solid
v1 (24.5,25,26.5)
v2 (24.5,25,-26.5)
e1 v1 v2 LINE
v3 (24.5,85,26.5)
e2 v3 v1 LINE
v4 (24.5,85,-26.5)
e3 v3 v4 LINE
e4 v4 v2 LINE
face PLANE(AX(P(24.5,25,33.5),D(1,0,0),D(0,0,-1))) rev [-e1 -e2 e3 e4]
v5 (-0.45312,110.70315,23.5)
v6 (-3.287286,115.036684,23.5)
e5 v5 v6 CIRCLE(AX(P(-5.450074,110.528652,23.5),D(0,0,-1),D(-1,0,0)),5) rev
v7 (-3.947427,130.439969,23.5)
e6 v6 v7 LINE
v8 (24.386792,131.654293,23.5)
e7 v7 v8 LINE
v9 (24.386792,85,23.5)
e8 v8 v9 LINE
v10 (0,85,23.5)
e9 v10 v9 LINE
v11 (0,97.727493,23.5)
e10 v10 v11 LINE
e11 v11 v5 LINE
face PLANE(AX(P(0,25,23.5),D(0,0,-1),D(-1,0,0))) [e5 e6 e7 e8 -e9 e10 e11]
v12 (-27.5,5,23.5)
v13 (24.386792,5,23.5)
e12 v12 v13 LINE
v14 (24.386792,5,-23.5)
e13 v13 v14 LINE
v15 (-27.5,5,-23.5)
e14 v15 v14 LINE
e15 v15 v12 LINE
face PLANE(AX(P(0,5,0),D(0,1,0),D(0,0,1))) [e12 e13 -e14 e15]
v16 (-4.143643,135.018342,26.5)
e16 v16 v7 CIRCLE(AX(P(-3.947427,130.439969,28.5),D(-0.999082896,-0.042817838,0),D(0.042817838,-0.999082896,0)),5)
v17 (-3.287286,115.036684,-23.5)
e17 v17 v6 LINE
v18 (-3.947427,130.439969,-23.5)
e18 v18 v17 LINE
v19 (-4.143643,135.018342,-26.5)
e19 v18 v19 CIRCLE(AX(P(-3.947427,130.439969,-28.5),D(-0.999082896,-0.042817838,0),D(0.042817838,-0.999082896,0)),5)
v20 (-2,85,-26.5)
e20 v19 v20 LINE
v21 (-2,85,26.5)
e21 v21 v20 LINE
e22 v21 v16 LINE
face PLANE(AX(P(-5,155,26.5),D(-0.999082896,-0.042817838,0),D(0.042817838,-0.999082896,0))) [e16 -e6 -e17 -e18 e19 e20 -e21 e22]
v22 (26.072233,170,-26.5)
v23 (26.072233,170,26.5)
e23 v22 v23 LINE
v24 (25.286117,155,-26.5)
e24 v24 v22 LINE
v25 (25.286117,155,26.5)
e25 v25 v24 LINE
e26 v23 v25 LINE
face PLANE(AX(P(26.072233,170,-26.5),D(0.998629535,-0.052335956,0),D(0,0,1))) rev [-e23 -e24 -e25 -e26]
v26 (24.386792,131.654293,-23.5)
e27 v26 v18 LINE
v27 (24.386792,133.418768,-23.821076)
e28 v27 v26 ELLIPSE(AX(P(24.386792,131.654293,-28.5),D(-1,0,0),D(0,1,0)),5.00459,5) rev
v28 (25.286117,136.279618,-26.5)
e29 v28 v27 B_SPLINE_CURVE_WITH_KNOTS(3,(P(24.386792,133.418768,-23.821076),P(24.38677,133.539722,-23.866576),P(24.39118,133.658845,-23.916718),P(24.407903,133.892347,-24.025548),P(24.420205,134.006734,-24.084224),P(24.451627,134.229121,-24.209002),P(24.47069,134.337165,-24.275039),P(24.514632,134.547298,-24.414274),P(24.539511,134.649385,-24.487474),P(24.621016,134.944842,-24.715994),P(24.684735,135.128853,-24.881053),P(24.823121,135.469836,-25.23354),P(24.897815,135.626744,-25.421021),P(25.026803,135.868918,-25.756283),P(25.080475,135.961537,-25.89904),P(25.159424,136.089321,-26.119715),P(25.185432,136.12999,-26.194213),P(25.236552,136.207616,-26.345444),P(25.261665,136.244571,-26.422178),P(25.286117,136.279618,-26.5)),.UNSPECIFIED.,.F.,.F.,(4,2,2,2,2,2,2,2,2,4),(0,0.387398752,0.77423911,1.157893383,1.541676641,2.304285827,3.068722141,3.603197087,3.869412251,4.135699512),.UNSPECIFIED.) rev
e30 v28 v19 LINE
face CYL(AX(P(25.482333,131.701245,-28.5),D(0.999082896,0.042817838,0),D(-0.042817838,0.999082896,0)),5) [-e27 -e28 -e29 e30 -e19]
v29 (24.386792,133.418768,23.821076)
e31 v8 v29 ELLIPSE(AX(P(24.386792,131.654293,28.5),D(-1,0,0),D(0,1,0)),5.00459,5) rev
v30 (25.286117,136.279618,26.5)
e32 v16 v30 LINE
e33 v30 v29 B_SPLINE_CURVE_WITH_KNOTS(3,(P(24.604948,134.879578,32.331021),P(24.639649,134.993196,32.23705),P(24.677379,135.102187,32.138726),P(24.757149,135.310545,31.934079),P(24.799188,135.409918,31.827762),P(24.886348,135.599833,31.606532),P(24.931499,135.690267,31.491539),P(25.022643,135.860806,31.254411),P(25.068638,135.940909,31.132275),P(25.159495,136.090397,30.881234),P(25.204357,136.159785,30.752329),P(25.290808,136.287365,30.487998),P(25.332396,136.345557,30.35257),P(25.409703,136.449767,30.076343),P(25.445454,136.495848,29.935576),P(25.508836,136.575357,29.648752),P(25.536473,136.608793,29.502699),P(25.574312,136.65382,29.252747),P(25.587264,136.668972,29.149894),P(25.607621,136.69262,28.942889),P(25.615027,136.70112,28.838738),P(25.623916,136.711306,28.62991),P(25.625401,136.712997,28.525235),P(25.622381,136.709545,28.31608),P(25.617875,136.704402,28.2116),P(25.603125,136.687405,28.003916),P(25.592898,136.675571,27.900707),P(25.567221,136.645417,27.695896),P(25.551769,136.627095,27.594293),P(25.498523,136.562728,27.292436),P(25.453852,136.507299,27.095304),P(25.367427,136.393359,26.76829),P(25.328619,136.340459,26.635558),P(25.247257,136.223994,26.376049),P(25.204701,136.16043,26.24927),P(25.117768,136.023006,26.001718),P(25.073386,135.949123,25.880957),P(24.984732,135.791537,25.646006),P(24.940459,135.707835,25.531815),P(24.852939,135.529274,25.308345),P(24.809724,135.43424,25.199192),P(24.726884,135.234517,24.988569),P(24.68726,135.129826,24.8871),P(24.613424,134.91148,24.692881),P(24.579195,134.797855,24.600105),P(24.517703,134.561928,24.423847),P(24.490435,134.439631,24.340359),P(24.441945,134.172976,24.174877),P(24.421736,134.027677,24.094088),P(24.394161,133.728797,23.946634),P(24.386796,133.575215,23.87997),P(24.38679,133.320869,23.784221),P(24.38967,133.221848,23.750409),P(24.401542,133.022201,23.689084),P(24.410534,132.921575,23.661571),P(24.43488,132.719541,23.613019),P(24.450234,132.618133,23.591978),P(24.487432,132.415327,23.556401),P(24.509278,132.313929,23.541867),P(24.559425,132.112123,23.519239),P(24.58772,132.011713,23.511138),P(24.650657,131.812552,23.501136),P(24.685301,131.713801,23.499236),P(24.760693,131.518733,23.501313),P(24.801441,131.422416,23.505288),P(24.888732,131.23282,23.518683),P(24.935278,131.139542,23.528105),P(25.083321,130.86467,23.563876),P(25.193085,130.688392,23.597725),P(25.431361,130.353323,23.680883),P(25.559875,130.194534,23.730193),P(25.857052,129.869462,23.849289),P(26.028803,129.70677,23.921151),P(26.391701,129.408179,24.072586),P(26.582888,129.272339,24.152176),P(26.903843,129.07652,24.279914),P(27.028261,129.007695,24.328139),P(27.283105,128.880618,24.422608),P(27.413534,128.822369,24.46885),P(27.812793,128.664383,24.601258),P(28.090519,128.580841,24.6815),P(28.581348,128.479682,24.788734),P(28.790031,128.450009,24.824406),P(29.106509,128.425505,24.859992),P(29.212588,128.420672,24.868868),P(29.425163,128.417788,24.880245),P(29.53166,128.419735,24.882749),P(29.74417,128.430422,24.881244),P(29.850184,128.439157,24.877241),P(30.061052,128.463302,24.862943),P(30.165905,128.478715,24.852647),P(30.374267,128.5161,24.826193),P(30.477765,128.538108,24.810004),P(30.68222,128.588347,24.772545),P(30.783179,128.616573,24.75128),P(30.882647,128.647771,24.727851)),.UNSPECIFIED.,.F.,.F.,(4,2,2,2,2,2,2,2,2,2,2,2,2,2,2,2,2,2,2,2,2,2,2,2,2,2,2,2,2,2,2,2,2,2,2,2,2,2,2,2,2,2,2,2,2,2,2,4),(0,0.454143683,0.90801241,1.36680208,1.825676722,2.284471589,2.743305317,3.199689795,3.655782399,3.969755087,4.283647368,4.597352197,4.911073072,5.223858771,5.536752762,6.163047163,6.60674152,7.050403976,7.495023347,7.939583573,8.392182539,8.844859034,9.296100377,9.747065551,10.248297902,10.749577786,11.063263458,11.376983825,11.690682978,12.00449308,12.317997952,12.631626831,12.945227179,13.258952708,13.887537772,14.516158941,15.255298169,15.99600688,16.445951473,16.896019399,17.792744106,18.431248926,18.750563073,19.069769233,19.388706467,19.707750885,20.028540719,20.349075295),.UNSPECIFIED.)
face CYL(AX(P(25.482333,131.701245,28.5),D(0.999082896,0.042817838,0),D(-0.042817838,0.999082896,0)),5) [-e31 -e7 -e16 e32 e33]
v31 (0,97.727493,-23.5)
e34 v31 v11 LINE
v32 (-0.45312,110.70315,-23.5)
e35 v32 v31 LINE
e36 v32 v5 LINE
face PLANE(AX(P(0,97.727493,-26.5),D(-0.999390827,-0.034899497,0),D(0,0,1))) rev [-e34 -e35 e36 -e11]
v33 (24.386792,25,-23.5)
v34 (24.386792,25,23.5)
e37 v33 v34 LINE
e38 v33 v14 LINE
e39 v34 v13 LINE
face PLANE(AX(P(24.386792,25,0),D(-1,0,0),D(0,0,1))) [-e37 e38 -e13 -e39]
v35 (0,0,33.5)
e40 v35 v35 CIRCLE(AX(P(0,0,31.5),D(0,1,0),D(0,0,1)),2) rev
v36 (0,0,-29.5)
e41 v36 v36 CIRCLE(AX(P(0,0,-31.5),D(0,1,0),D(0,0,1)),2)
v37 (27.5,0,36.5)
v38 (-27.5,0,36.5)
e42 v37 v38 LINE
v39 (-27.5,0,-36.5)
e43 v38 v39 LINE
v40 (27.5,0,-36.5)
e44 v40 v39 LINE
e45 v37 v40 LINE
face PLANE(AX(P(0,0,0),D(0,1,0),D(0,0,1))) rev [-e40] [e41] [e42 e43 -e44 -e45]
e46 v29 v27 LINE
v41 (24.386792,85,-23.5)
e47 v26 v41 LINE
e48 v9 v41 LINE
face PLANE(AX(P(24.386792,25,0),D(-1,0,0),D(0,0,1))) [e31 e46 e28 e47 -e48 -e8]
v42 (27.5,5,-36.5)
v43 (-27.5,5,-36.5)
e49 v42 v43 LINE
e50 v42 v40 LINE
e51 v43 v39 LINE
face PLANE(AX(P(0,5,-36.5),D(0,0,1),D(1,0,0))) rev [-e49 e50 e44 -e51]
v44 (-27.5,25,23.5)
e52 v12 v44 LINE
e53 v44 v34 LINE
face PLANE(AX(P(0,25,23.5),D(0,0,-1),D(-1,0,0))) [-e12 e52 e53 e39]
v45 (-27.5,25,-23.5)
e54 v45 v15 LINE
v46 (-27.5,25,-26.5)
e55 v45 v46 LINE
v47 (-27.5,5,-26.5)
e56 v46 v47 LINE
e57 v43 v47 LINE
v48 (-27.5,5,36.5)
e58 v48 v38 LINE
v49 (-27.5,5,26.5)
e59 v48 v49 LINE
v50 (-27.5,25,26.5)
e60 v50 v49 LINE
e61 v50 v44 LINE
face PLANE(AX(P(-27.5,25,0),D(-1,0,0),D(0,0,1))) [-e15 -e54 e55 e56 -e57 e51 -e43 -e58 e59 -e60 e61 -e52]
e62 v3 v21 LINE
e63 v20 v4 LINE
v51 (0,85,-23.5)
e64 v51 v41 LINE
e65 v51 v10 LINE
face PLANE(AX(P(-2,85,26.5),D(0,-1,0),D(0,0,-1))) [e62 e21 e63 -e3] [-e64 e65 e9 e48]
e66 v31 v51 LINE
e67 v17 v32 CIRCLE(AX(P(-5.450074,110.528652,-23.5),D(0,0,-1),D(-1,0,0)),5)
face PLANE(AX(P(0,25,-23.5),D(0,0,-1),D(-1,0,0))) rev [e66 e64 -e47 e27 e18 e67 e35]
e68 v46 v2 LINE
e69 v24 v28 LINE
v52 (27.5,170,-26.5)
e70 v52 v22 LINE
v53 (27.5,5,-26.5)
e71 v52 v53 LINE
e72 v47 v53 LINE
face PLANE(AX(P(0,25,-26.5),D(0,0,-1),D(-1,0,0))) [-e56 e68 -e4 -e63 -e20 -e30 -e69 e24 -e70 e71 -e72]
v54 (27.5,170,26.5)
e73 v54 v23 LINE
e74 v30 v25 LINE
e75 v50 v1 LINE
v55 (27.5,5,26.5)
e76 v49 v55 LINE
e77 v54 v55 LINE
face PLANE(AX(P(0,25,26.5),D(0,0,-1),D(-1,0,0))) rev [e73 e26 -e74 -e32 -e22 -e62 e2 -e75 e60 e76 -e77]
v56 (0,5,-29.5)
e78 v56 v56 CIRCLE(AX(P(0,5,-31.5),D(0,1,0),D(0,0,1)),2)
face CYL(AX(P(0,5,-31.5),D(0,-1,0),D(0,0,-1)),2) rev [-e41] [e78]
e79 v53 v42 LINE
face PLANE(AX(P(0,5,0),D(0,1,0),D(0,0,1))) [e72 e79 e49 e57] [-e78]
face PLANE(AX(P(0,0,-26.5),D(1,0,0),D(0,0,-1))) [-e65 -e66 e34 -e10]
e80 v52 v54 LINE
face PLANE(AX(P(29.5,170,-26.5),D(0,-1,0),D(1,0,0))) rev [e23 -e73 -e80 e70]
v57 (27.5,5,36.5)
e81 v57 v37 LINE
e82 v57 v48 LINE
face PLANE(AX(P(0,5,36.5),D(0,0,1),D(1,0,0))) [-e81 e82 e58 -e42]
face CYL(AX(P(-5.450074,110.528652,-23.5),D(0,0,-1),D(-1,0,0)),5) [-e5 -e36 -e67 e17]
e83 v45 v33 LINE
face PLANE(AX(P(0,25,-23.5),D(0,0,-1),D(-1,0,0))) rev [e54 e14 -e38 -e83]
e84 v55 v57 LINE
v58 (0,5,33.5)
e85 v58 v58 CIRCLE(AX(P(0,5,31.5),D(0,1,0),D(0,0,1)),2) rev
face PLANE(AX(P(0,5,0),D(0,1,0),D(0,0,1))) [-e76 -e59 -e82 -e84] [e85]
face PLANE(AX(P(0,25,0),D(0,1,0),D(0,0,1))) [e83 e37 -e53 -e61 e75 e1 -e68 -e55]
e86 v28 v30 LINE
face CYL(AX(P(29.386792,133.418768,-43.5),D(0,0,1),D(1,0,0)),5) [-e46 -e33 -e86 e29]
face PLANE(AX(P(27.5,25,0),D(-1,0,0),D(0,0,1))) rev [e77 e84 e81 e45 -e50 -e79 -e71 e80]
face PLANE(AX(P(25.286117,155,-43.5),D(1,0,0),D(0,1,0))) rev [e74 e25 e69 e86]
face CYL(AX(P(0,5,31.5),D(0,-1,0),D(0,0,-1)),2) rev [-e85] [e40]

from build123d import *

# Parameters (mm, degrees)
CROQUIS1_W              = 55
CROQUIS1_H              = 53
CROQUIS1_W_2            = 48.773584906
CROQUIS1_H_2            = 47
SALIENTE_EXTRUIR1_DEPTH = 25
SALIENTE_EXTRUIR2_DEPTH = 160
SALIENTE_EXTRUIR3_DEPTH = 50
SALIENTE_EXTRUIR5_DEPTH = 3
CROQUIS4_W              = 100
CROQUIS4_H              = 30
CORTAR_EXTRUIR1_DEPTH   = 63
CHAFL_N1_SIZE           = 2
CHAFL_N1_SIZE2          = 57.272506566
CROQUIS1_2_W            = 55
CROQUIS1_2_H            = 53
CROQUIS1_2_W_2          = 48.773584906
CROQUIS1_2_H_2          = 47
SALIENTE_EXTRUIR6_DEPTH = 5
CROQUIS5_W              = 30
CROQUIS5_H              = 60
CORTAR_EXTRUIR2_DEPTH   = 60
CROQUIS1_4_W            = 55
CROQUIS1_4_H            = 10
CROQUIS1_4_R            = 2
SALIENTE_EXTRUIR7_DEPTH = 5
CROQUIS6_W              = 53
CROQUIS6_H              = 15
CORTAR_EXTRUIR3_DEPTH   = 5
CHAFL_N2_SIZE           = 30
CHAFL_N2_SIZE_2         = 1.572233378
CHAFL_N3_SIZE           = 5
CHAFL_N3_SIZE2          = 0.881634904
CROQUIS7_W              = 47
CROQUIS7_H              = 20
CORTAR_EXTRUIR4_DEPTH   = 40
CROQUIS8_W              = 47
CROQUIS8_H              = 40
CORTAR_EXTRUIR5_DEPTH   = 10
CORTAR_EXTRUIR6_DEPTH   = 70
REDONDEO3_R             = 5
REDONDEO5_R             = 5


with BuildPart() as part:
    # Croquis1 → Saliente-Extruir1 (new body)
    with BuildSketch(Plane(origin=(0, 0, 0), x_dir=(1, 0, 0), z_dir=(0, 1, 0))):
        Rectangle(CROQUIS1_W, CROQUIS1_H)
        Rectangle(CROQUIS1_W_2, CROQUIS1_H_2, mode=Mode.SUBTRACT)
    extrude(amount=SALIENTE_EXTRUIR1_DEPTH)

    # Croquis2 → Saliente-Extruir2 (add)
    with BuildSketch(Plane(origin=(0, 25, 0), x_dir=(1, 0, 0), z_dir=(0, 1, 0))):
        Polygon((0, 23.5), (0, 26.5), (27.5, 26.5), (27.5, -26.5), (0, -26.5), (0, -23.5), (24.386792453, -23.5), (24.386792453, 23.5), align=None)
    extrude(amount=SALIENTE_EXTRUIR2_DEPTH)



with BuildPart() as body_2:
    # Croquis3 → Saliente-Extruir3 (new body)
    with BuildSketch(Plane(origin=(0, 0, 23.5), x_dir=(-1, 0, 0), z_dir=(0, 0, -1))):
        Polygon((0, 155), (5, 155), (2, 85), (0, 85), align=None)
    extrude(amount=SALIENTE_EXTRUIR3_DEPTH)


with BuildPart() as part_1:
    add(part.part)

    add(body_2.part)  # Saliente-Extruir5 merges body 2
    # Croquis3<4> → Saliente-Extruir5 (add)
    with BuildSketch(Plane(origin=(0, 0, 23.5), x_dir=(-1, 0, 0), z_dir=(0, 0, -1))):
        Polygon((0, 155), (5, 155), (2, 85), (0, 85), align=None)
    extrude(amount=-SALIENTE_EXTRUIR5_DEPTH)

    # Croquis4 → Cortar-Extruir1 (cut)
    with BuildSketch(Plane(origin=(0, 0, -26.5), x_dir=(-1, 0, 0), z_dir=(0, 0, -1))):
        with Locations((25.5, 170)):
            Rectangle(CROQUIS4_W, CROQUIS4_H)
    extrude(amount=-CORTAR_EXTRUIR1_DEPTH, mode=Mode.SUBTRACT)

    # Chaflán1
    chafl_n1_edges = [part_1.edges().sort_by_distance(p)[0] for p in [
        (0, 155, 0),
    ]]
    chafl_n1_side = [part_1.faces().sort_by_distance(p)[0] for p in [
        (9.75, 155, -25.893431785),
    ]]
    chamfer(chafl_n1_edges, length=CHAFL_N1_SIZE, length2=CHAFL_N1_SIZE2, reference=chafl_n1_side[0])

    # Croquis1<2> → Saliente-Extruir6 (add)
    # profile 1 of 2: a face of its own
    with BuildSketch(Plane(origin=(0, 0, 0), x_dir=(1, 0, 0), z_dir=(0, 1, 0))):
        Rectangle(CROQUIS1_2_W, CROQUIS1_2_H)
        Rectangle(CROQUIS1_2_W_2, CROQUIS1_2_H_2, mode=Mode.SUBTRACT)
    # profile 2 of 2: a face of its own
    with BuildSketch(Plane(origin=(0, 0, 0), x_dir=(1, 0, 0), z_dir=(0, 1, 0))):
        Rectangle(CROQUIS1_2_W_2, CROQUIS1_2_H_2)
    extrude(amount=SALIENTE_EXTRUIR6_DEPTH)

    # Croquis5 → Cortar-Extruir2 (cut)
    with BuildSketch(Plane(origin=(0, 0, -26.5), x_dir=(-1, 0, 0), z_dir=(0, 0, -1))):
        with Locations((-9.5, 55)):
            Rectangle(CROQUIS5_W, CROQUIS5_H)
    extrude(amount=-CORTAR_EXTRUIR2_DEPTH, mode=Mode.SUBTRACT)

    # Croquis1<4> → Saliente-Extruir7 (add)
    # profile 1 of 2: a face of its own
    with BuildSketch(Plane(origin=(0, 0, 0), x_dir=(1, 0, 0), z_dir=(0, 1, 0))):
        with Locations((0, 31.5)):
            Rectangle(CROQUIS1_4_W, CROQUIS1_4_H)
        with Locations(Location((0, 31.5, 0), (0, 0, 270))):
            Circle(CROQUIS1_4_R, mode=Mode.SUBTRACT)
    # profile 2 of 2: a face of its own
    with BuildSketch(Plane(origin=(0, 0, 0), x_dir=(1, 0, 0), z_dir=(0, 1, 0))):
        with Locations((0, -31.5)):
            Rectangle(CROQUIS1_4_W, CROQUIS1_4_H)
        with Locations(Location((0, -31.5, 0), (0, 0, 270))):
            Circle(CROQUIS1_4_R, mode=Mode.SUBTRACT)
    extrude(amount=SALIENTE_EXTRUIR7_DEPTH)

    # Croquis6 → Cortar-Extruir3 (cut)
    with BuildSketch(Plane.ZY.offset(-24.5)):
        with Locations((0, 177.5)):
            Rectangle(CROQUIS6_W, CROQUIS6_H)
    extrude(amount=-CORTAR_EXTRUIR3_DEPTH, mode=Mode.SUBTRACT)

    # Chaflán2
    # the kernel refuses this chamfer: 30, 1.572233378 mm, written as the material it takes off along each edge
    with BuildSketch(Plane(origin=(24.5, 170, -104.496046635), x_dir=(-0.002013023422382327, -0.9999979738662979, 0), z_dir=(0, 0, 1))) as chafl_n2_piece_1_section:
        Polygon((CHAFL_N2_SIZE * 0.999997973866, CHAFL_N2_SIZE * 0.00201302342238), (-CHAFL_N2_SIZE_2 * 0.00201302342301, CHAFL_N2_SIZE_2 * 0.999997974179), (0, 0), align=None)
    chafl_n2_piece_1 = extrude(amount=208.992093269, mode=Mode.PRIVATE)
    chafl_n2_piece_1 = split(chafl_n2_piece_1, bisect_by=Plane(origin=(25.111424092, 155, 0), z_dir=(0, 1, 0)), keep=Keep.TOP, mode=Mode.PRIVATE)
    add(chafl_n2_piece_1, mode=Mode.SUBTRACT)

    # Chaflán3
    chafl_n3_edges = [part_1.edges().sort_by_distance(p)[0] for p in [
        (24.386792453, 155, 0),
    ]]
    chafl_n3_side = [part_1.faces().sort_by_distance(p)[0] for p in [
        (24.386792453, 120, 0),
    ]]
    chamfer(chafl_n3_edges, length=CHAFL_N3_SIZE, length2=CHAFL_N3_SIZE2, reference=chafl_n3_side[0])

    # Croquis7 → Cortar-Extruir4 (cut)
    with BuildSketch(Plane.ZY.offset(27.5)):
        with Locations((0, 15)):
            Rectangle(CROQUIS7_W, CROQUIS7_H)
    extrude(amount=-CORTAR_EXTRUIR4_DEPTH, mode=Mode.SUBTRACT)

    # Croquis8 → Cortar-Extruir5 (cut)
    with BuildSketch(Plane(origin=(1.639845182, 0.070279079, 0), x_dir=(0, 0, 1), z_dir=(-0.9990828958176697, -0.04281783839218585, 0))):
        with Locations((0, 135.071938044)):
            Rectangle(CROQUIS8_W, CROQUIS8_H)
    extrude(amount=-CORTAR_EXTRUIR5_DEPTH, mode=Mode.SUBTRACT)

    # Croquis9 → Cortar-Extruir6 (cut)
    with BuildSketch(Plane.XY.offset(26.5)):
        Polygon((-5, 155), (25.286116689, 155), (25.286116689, 136.279617509), (-4.143643232, 135.018342084), align=None)
    extrude(amount=-CORTAR_EXTRUIR6_DEPTH, mode=Mode.SUBTRACT)

    # Redondeo3
    # the kernel refuses this fillet: 5 mm, written as the material it takes off along each edge
    with BuildSketch(Plane(origin=(-4.143643232, 135.018342084, 23.5), x_dir=(0, 0, 1), z_dir=(0.9990828958176697, 0.042817838392185704, 0))) as redondeo3_piece_1_section:
        with BuildLine():
            CenterArc((5, 4.582575695), REDONDEO3_R, 180, 66.421821522)
            Line((0, 4.582575695), (-0.1, 4.582575695))
            Line((-0.1, 4.582575695), (-0.1, 0))
            Line((-0.1, 0), (0, -0.1))
            ThreePointArc((0, -0.1), (1.5, -0.1), (2.96, -0.091651514))
            Line((2.96, -0.091651514), (3, 0))
        make_face()
    redondeo3_piece_1 = extrude(amount=40.013064323, mode=Mode.PRIVATE)
    redondeo3_piece_1 = split(redondeo3_piece_1, bisect_by=Plane(origin=(24.386792453, 134.515316135, 24.276456874), z_dir=(-1, 0, 0)), keep=Keep.TOP, mode=Mode.PRIVATE)
    add(redondeo3_piece_1, mode=Mode.SUBTRACT)
    with BuildSketch(Plane(origin=(24.386792453, 136.241075042, 23.5), x_dir=(0.9990828958176863, 0.04281783839180005, 0), z_dir=(0, 0, -1))) as redondeo3_piece_2:
        with BuildLine():
            CenterArc((4.874569404, 3.033807599), REDONDEO3_R, 182.454031675, 34.901674654)
            Line((-0.120845075, 2.819718407), (-0.220753364, 2.815436623))
            Line((-0.220753364, 2.815436623), (-0.09990829, -0.004281784))
            Line((-0.09990829, -0.004281784), (0, -0.1))
            ThreePointArc((0, -0.1), (0.450074884, -0.1), (0.820661375, -0.060676152))
            Line((0.820661375, -0.060676152), (0.900149768, 0))
        make_face()
    extrude(amount=47, mode=Mode.SUBTRACT)
    with BuildSketch(Plane(origin=(35.832724942, 136.731615005, -23.5), x_dir=(0.0428178383921857, -0.9990828958176697, 0), z_dir=(-0.9990828958176697, -0.042817838392185704, 0))) as redondeo3_piece_3_section:
        with BuildLine():
            CenterArc((4.582575695, -5), REDONDEO3_R, 90, 66.421821522)
            Line((0, -3), (-0.091651514, -2.96))
            ThreePointArc((-0.091651514, -2.96), (-0.1, -1.5), (-0.1, 0))
            Line((-0.1, 0), (0, 0.1))
            Line((0, 0.1), (4.582575695, 0.1))
            Line((4.582575695, 0.1), (4.582575695, 0))
        make_face()
    redondeo3_piece_3 = extrude(amount=40.013064323, mode=Mode.PRIVATE)
    redondeo3_piece_3 = split(redondeo3_piece_3, bisect_by=Plane(origin=(24.386792453, 134.515316135, -24.276456874), z_dir=(-1, 0, 0)), keep=Keep.TOP, mode=Mode.PRIVATE)
    add(redondeo3_piece_3, mode=Mode.SUBTRACT)
    with BuildSketch(Plane(origin=(-4.143643232, 135.018342084, 23.5), x_dir=(0, 0, 1), z_dir=(0.9990828958176697, 0.042817838392185704, 0))) as redondeo3_piece_4a_section:
        with BuildLine():
            CenterArc((5, 4.582575695), REDONDEO3_R, 180, 66.421821522)
            Line((0, 4.582575695), (-0.1, 4.582575695))
            Line((-0.1, 4.582575695), (-0.1, 0))
            Line((-0.1, 0), (0, -0.1))
            ThreePointArc((0, -0.1), (1.5, -0.1), (2.96, -0.091651514))
            Line((2.96, -0.091651514), (3, 0))
        make_face()
    redondeo3_piece_4a = extrude(amount=40.013064323, mode=Mode.PRIVATE)
    redondeo3_piece_4a = split(redondeo3_piece_4a, bisect_by=Plane(origin=(24.386792453, 135.366576267, 24.274229372), z_dir=(1, 0, 0)), keep=Keep.TOP, mode=Mode.PRIVATE)
    with BuildSketch(Plane(origin=(24.386792453, 136.241075042, 30.555766892), x_dir=(0.9990828958176863, 0.04281783839180005, 0), z_dir=(0, 0, -1))) as redondeo3_piece_4b_section:
        with BuildLine():
            CenterArc((4.874569404, 3.033807599), REDONDEO3_R, 182.454031675, 34.901674654)
            Line((-0.120845075, 2.819718407), (-0.220753364, 2.815436623))
            Line((-0.220753364, 2.815436623), (-0.09990829, -0.004281784))
            Line((-0.09990829, -0.004281784), (0, -0.1))
            ThreePointArc((0, -0.1), (0.450074884, -0.1), (0.820661375, -0.060676152))
            Line((0.820661375, -0.060676152), (0.900149768, 0))
        make_face()
    redondeo3_piece_4b = extrude(amount=54.055766892, mode=Mode.PRIVATE)
    redondeo3_piece_4b = split(redondeo3_piece_4b, bisect_by=Plane(origin=(24.583130189, 135.440658169, 23.5), z_dir=(0, 0, 1)), keep=Keep.TOP, mode=Mode.PRIVATE)
    redondeo3_piece_4 = redondeo3_piece_4a & redondeo3_piece_4b
    add(redondeo3_piece_4, mode=Mode.SUBTRACT)
    with BuildSketch(Plane(origin=(35.832724942, 136.731615005, -23.5), x_dir=(0.0428178383921857, -0.9990828958176697, 0), z_dir=(-0.9990828958176697, -0.042817838392185704, 0))) as redondeo3_piece_5a_section:
        with BuildLine():
            CenterArc((4.582575695, -5), REDONDEO3_R, 90, 66.421821522)
            Line((0, -3), (-0.091651514, -2.96))
            ThreePointArc((-0.091651514, -2.96), (-0.1, -1.5), (-0.1, 0))
            Line((-0.1, 0), (0, 0.1))
            Line((0, 0.1), (4.582575695, 0.1))
            Line((4.582575695, 0.1), (4.582575695, 0))
        make_face()
    redondeo3_piece_5a = extrude(amount=40.013064323, mode=Mode.PRIVATE)
    redondeo3_piece_5a = split(redondeo3_piece_5a, bisect_by=Plane(origin=(24.386792453, 135.366576267, -24.274229372), z_dir=(1, 0, 0)), keep=Keep.TOP, mode=Mode.PRIVATE)
    with BuildSketch(Plane(origin=(24.386792453, 136.241075042, 23.5), x_dir=(0.9990828958176863, 0.04281783839180005, 0), z_dir=(0, 0, -1))) as redondeo3_piece_5b_section:
        with BuildLine():
            CenterArc((4.874569404, 3.033807599), REDONDEO3_R, 182.454031675, 34.901674654)
            Line((-0.120845075, 2.819718407), (-0.220753364, 2.815436623))
            Line((-0.220753364, 2.815436623), (-0.09990829, -0.004281784))
            Line((-0.09990829, -0.004281784), (0, -0.1))
            ThreePointArc((0, -0.1), (0.450074884, -0.1), (0.820661375, -0.060676152))
            Line((0.820661375, -0.060676152), (0.900149768, 0))
        make_face()
    redondeo3_piece_5b = extrude(amount=54.055766892, mode=Mode.PRIVATE)
    redondeo3_piece_5b = split(redondeo3_piece_5b, bisect_by=Plane(origin=(24.583130189, 135.440658169, -23.5), z_dir=(0, 0, -1)), keep=Keep.TOP, mode=Mode.PRIVATE)
    redondeo3_piece_5 = redondeo3_piece_5a & redondeo3_piece_5b
    add(redondeo3_piece_5, mode=Mode.SUBTRACT)

    # Redondeo5
    # the kernel refuses this fillet: 5 mm, written as the material it takes off along each edge
    with BuildSketch(Plane(origin=(-0.608459404, 115.151491041, -23.5), x_dir=(-0.9990828958176692, -0.04281783839219633, 0), z_dir=(0, 0, 1))) as redondeo5_piece_1:
        with BuildLine():
            CenterArc((5.035114331, 4.411291484), REDONDEO5_R, 179.545968325, 62.370023628)
            Line((0.035271319, 4.450912808), (0, 0))
            Line((0, 0), (2.681286079, 0))
        make_face()
    extrude(amount=47, mode=Mode.SUBTRACT)


solid = part_1.part
